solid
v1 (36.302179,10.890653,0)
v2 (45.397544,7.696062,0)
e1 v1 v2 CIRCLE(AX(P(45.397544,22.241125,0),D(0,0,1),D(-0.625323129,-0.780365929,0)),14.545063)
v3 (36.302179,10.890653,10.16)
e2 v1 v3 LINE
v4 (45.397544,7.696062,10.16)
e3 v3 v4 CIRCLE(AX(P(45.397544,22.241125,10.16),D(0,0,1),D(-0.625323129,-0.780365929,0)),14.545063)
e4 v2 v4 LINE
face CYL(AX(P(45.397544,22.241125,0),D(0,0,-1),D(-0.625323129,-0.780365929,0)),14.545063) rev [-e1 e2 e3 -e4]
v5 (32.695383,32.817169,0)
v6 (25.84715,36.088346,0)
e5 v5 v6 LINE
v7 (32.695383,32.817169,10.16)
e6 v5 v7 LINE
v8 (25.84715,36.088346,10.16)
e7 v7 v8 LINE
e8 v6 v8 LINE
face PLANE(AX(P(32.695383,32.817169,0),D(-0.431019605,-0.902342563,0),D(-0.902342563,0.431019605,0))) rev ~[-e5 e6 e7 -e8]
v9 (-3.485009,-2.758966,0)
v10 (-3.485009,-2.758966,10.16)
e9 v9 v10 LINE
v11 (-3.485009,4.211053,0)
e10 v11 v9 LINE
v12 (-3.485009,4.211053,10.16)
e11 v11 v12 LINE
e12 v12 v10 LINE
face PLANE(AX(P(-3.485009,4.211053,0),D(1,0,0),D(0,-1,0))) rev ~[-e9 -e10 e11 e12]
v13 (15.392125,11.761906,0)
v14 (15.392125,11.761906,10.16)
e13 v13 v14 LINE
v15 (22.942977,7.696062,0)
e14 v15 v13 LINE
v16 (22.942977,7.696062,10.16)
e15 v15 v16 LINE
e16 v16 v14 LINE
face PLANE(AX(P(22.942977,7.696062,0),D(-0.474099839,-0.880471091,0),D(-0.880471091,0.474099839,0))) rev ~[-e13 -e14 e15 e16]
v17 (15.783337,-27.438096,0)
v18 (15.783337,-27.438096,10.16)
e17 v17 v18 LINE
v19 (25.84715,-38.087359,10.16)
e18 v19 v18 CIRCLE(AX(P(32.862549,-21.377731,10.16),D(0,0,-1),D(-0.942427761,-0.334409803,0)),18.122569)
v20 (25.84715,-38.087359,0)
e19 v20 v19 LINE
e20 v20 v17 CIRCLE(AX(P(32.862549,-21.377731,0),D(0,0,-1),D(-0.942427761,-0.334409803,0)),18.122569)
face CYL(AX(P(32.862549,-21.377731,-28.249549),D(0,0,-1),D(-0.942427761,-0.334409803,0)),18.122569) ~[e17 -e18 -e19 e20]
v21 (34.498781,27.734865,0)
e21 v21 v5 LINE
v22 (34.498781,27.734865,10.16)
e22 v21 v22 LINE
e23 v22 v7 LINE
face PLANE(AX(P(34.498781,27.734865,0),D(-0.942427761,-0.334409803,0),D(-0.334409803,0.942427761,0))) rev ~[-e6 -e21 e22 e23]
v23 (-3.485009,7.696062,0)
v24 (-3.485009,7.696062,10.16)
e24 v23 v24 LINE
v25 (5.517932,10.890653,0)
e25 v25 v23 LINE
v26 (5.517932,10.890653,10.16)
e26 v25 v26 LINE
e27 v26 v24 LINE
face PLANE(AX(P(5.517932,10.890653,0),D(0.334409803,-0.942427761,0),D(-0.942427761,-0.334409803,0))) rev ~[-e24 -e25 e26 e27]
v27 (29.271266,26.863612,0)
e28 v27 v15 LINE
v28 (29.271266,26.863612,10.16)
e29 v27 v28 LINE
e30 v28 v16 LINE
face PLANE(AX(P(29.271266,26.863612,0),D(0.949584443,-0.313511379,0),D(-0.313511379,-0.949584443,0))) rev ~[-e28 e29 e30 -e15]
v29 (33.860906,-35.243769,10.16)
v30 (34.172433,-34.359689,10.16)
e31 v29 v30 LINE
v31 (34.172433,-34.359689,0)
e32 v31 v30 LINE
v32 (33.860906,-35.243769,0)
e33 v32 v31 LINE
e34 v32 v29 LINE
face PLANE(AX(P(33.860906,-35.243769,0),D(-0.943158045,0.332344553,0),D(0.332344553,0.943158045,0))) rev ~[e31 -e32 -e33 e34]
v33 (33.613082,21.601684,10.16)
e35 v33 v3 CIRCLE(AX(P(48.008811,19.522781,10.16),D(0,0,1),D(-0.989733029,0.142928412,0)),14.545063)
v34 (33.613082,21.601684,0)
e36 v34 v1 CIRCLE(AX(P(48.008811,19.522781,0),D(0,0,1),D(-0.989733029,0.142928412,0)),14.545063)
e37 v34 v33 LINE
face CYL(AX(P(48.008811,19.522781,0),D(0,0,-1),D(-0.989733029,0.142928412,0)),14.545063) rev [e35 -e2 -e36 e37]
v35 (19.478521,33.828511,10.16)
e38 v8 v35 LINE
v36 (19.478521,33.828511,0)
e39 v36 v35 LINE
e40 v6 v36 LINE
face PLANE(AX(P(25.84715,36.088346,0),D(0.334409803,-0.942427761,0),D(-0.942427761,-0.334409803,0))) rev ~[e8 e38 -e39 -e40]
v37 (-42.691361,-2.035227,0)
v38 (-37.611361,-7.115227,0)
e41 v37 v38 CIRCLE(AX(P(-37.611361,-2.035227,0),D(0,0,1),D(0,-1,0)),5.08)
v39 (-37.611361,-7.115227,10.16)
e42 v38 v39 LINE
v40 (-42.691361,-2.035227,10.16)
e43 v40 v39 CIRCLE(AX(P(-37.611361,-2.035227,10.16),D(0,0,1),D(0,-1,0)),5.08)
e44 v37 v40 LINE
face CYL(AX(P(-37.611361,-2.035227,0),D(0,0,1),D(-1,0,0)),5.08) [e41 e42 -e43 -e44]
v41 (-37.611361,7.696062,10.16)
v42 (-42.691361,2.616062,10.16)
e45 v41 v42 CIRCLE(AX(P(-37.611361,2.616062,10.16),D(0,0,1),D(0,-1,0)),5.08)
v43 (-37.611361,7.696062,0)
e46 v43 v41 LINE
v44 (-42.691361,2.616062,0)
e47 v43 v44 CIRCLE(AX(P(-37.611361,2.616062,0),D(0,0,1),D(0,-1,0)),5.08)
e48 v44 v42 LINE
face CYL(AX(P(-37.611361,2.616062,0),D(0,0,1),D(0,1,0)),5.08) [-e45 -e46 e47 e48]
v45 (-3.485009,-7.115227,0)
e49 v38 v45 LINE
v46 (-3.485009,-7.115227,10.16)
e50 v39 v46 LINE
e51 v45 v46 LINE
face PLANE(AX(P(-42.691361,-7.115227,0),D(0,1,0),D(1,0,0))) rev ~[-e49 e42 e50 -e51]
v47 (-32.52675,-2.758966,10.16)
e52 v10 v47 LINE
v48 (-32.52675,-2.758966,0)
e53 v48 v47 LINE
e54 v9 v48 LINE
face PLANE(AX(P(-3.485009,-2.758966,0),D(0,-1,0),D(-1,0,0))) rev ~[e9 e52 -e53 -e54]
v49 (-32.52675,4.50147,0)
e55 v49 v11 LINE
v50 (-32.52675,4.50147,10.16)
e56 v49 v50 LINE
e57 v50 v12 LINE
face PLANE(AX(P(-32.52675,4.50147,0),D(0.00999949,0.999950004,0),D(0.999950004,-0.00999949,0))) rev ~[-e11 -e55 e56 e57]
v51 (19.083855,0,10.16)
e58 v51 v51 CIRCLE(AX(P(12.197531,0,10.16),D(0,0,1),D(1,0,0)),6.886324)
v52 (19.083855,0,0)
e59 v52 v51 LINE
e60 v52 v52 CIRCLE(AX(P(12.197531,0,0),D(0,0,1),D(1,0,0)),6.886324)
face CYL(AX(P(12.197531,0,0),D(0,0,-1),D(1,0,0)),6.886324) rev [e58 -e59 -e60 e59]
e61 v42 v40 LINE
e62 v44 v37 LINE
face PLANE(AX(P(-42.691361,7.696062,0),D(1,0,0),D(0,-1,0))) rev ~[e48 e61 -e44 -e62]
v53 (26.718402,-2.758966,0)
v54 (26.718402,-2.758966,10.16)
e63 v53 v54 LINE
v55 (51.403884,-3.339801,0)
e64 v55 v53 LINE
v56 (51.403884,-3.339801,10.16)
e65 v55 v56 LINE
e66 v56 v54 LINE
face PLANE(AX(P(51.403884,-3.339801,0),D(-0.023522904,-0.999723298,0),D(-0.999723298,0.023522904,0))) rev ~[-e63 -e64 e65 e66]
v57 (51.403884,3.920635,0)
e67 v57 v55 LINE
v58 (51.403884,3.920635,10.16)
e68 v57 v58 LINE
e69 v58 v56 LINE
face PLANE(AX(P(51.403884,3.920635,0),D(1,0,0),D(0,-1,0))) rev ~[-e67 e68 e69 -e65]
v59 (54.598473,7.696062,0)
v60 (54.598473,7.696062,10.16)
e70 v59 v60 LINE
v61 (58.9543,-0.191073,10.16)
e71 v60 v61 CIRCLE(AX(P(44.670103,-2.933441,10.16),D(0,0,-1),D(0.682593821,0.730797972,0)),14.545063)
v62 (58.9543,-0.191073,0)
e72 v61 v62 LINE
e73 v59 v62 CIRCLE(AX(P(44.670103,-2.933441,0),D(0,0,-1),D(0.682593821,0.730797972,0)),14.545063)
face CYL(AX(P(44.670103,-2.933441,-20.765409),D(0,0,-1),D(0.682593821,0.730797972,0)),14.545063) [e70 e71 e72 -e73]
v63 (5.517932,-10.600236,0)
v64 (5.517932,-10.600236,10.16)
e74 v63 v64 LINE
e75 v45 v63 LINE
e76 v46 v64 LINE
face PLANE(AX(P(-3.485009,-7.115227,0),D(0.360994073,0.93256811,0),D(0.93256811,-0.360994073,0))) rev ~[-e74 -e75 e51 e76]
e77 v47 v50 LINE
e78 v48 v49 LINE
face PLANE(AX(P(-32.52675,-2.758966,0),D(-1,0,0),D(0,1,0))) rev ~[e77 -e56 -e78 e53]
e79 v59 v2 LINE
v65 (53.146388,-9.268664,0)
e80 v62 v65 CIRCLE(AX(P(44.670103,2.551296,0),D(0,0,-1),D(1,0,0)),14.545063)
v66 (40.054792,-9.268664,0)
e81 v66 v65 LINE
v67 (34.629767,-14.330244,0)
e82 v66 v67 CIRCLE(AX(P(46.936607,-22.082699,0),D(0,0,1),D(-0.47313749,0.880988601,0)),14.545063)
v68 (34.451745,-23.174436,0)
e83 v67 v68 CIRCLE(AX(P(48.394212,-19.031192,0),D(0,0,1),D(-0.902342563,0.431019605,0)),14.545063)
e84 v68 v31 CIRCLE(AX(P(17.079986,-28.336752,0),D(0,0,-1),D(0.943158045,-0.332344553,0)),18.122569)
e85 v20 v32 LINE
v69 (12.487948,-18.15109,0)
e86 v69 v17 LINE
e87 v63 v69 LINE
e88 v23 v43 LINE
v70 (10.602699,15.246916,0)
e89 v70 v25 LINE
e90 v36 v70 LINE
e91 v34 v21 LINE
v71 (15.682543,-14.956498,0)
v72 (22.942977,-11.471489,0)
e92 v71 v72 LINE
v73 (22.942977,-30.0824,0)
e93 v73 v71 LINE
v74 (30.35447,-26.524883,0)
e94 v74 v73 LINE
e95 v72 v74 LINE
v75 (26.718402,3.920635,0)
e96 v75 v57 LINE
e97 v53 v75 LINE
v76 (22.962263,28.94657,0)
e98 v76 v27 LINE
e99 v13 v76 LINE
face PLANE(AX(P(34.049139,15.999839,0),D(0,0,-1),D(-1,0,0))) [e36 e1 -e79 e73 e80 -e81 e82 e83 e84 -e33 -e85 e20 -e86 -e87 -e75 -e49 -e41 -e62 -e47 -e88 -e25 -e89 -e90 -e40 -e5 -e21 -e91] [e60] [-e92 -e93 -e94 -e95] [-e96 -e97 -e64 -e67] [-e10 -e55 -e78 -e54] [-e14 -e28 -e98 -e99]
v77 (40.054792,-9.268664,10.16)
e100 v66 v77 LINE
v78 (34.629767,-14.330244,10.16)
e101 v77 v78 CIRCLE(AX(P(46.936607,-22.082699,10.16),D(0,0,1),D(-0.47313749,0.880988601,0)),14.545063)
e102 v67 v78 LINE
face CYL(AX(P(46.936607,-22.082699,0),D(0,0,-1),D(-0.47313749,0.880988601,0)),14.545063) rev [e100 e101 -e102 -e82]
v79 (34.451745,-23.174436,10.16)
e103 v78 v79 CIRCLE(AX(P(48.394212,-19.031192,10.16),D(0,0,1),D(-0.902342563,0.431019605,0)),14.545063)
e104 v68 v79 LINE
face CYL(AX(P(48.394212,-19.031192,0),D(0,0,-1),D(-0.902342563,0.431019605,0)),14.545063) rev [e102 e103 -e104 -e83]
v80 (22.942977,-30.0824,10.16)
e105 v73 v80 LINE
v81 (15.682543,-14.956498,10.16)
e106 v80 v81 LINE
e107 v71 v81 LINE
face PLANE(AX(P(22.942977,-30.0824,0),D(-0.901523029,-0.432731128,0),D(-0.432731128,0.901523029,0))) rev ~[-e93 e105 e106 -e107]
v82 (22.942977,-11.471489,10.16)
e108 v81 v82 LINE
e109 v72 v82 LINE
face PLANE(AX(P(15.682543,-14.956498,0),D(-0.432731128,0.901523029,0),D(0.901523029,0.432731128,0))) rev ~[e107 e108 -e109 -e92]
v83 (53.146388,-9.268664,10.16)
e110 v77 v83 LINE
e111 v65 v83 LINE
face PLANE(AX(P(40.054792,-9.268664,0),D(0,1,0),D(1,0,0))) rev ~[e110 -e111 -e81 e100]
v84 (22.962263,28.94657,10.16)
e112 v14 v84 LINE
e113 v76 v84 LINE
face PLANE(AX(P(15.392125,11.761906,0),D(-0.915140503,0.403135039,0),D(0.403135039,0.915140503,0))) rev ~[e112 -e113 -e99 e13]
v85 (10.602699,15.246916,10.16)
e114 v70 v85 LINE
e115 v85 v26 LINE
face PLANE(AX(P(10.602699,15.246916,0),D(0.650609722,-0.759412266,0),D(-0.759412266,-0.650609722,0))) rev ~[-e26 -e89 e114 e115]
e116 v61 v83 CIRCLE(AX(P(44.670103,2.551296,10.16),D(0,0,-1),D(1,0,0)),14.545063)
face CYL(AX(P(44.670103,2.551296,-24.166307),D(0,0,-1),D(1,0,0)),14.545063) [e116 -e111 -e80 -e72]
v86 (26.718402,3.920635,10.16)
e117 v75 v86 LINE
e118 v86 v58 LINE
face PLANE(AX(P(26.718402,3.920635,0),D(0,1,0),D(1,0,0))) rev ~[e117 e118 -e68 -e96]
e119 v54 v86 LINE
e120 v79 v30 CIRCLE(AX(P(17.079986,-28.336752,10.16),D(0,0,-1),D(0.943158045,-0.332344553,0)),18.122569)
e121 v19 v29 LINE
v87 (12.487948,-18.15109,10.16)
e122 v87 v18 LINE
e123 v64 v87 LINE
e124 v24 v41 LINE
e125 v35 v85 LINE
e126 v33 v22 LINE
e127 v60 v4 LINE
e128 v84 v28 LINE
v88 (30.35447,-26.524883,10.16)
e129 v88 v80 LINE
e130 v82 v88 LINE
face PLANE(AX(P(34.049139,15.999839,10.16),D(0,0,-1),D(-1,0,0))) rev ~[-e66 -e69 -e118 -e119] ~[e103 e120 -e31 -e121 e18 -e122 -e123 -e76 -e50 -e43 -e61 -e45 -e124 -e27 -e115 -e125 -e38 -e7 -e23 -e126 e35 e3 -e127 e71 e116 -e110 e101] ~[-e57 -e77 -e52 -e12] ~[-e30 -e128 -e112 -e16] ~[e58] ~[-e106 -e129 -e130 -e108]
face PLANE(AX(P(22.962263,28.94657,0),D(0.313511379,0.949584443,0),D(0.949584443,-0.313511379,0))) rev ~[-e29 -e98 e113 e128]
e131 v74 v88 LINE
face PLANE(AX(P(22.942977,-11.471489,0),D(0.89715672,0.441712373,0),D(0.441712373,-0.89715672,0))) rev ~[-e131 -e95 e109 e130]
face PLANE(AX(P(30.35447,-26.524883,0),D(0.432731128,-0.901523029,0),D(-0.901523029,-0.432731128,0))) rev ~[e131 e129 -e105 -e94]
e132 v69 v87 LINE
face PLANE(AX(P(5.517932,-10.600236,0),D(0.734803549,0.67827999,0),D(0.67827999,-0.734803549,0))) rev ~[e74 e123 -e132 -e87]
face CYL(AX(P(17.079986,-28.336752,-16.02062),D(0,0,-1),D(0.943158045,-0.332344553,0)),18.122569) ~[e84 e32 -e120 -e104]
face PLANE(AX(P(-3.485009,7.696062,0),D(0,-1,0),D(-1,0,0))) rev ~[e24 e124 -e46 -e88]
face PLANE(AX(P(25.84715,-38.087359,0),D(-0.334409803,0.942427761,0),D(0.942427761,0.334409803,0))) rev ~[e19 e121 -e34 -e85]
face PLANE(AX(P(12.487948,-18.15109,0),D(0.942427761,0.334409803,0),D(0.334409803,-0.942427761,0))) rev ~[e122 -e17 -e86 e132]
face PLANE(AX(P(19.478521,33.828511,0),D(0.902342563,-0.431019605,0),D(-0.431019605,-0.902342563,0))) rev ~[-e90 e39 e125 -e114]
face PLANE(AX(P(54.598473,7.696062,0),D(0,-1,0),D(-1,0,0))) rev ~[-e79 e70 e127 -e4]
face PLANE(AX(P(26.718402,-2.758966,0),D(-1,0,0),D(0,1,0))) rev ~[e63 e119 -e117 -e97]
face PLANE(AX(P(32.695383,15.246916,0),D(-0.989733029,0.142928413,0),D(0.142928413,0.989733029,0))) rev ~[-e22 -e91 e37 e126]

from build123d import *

# Parameters (mm, degrees)
F0_R        = 6.8863244876
F1_DEPTH    = 10.16
F2_T1_DEPTH = 66.6590982347
F2_T3_DEPTH = 42.201240443
F3_T1_DEPTH = 10.16
F3_T3_DEPTH = 58.4926144872
F3_T5_DEPTH = 51.6908183144
F4_R        = 5.08


# Not quite as in the source:
# - a fillet or chamfer that OpenCascade refuses, or shapes differently, is made with other operations: its cross-section is extruded or revolved along the edge and cut away or added


with BuildPart() as f1:
    # F0 (on Top) → F1 (new body)
    with BuildSketch(Plane.XY):
        Polygon((10.6026988985, 15.246915631), (5.517931655, 10.8906533569), (-3.485009307, 7.6960618608), (-42.6913611591, 7.6960618608), (-42.6913611591, -7.1152271703), (-3.485009307, -7.1152271703), (5.517931655, -10.6002362445), (12.4879479408, -18.1510895491), (19.5621072062, -38.0873594287), (25.8471500129, -38.0873594287), (33.8609059311, -35.2437690269), (36.3021790981, -28.315698728), (32.69538281, -18.1510895491), (36.3021790981, -10.6002362445), (40.0547920587, -9.2686640946), (53.1463883817, -9.2686640946), (59.2151660388, -7.1152271703), (59.2151660388, 5.3727226332), (54.5984730124, 7.6960618608), (40.0547920587, 7.6960618608), (36.3021790981, 10.8906533569), (32.69538281, 15.246915631), (34.4987809541, 27.7348645031), (32.69538281, 32.8171690926), (25.8471500129, 36.0883464863), (19.4785206028, 33.8285105681), align=None)
        Polygon((15.6825426966, -14.9564975873), (22.9429770261, -11.4714885131), (30.3544697336, -26.5248827454), (22.9429770261, -30.0823998534), align=None, mode=Mode.SUBTRACT)
        Polygon((-32.5267501175, -2.7589655947), (-32.5267501175, 4.501469899), (-3.485009307, 4.2110527866), (-3.485009307, -2.7589655947), align=None, mode=Mode.SUBTRACT)
        with Locations((12.1975308284, 0)):
            Circle(F0_R, mode=Mode.SUBTRACT)
        Polygon((51.4038838446, -3.339800518), (26.7184022814, -2.7589655947), (26.7184022814, 3.9206352085), (51.4038838446, 3.9206352085), align=None, mode=Mode.SUBTRACT)
        Polygon((22.9429770261, 7.6960618608), (15.3921246529, 11.7619056255), (22.962263142, 28.9465700275), (29.2712664114, 26.8636122346), align=None, mode=Mode.SUBTRACT)
    extrude(amount=F1_DEPTH)

    # F2: fillet of radius 18.1225687259 on 2 edges, made by hand

    # F2_s2 → F2_t1 (cut)
    with BuildSketch(Plane.XY.offset(-28.2495491174)):
        with BuildLine():
            ThreePointArc((15.7833367489, -27.4380957037), (19.6910161344, -33.825149661), (25.8471500129, -38.0873594287))
            Line((25.8471500129, -38.0873594287), (19.5621072062, -38.0873594287))
            Line((19.5621072062, -38.0873594287), (15.7833367489, -27.4380957037))
        make_face()
    extrude(amount=F2_T1_DEPTH, mode=Mode.SUBTRACT)

    # F2_s4 → F2_t3 (cut)
    with BuildSketch(Plane.XY.offset(-16.0206202215)):
        with BuildLine():
            ThreePointArc((34.1724327506, -34.3596894675), (35.202544115, -28.3169031391), (34.15919812, -22.2763878325))
            Line((34.15919812, -22.2763878325), (36.3021790981, -28.315698728))
            Line((36.3021790981, -28.315698728), (34.1724327506, -34.3596894675))
        make_face()
    extrude(amount=F2_T3_DEPTH, mode=Mode.SUBTRACT)

    # F3: fillet of radius 14.545063472 on 6 edges, made by hand

    # F3_s2 → F3_t1 (join)
    with BuildSketch(Plane.XY):
        with BuildLine():
            ThreePointArc((33.6130817468, 21.6016839559), (33.901548417, 15.9810300876), (36.3021790981, 10.8906533569))
            Line((36.3021790981, 10.8906533569), (32.69538281, 15.246915631))
            Line((32.69538281, 15.246915631), (33.6130817468, 21.6016839559))
        make_face()
        with BuildLine():
            ThreePointArc((36.3021790981, 10.8906533569), (40.5775055267, 8.5179295182), (45.3975437049, 7.6960618608))
            Line((45.3975437049, 7.6960618608), (40.0547920587, 7.6960618608))
            Line((40.0547920587, 7.6960618608), (36.3021790981, 10.8906533569))
        make_face()
        with BuildLine():
            ThreePointArc((35.2695823203, -12.7619848351), (33.8938078195, -17.8922695477), (34.4517445702, -23.1744360815))
            Line((34.4517445702, -23.1744360815), (33.0574978105, -23.5887604555))
            ThreePointArc((33.0574978105, -23.5887604555), (32.7884309604, -22.7627890129), (31.3246156504, -18.6374907295))
            Line((31.3246156504, -18.6374907295), (31.3829198252, -17.5241687984))
            Line((31.3829198252, -17.5241687984), (33.9571193355, -12.1350640844))
            Line((33.9571193355, -12.1350640844), (35.2695823203, -12.7619848351))
        make_face()
        with BuildLine():
            ThreePointArc((40.0547920587, -9.2686640946), (36.4117244984, -12.043489977), (33.8119770372, -15.8134917097))
            Line((33.8119770372, -15.8134917097), (36.3021790981, -10.6002362445))
            Line((36.3021790981, -10.6002362445), (40.0547920587, -9.2686640946))
        make_face()
    extrude(amount=F3_T1_DEPTH)

    # F3_s4 → F3_t3 (cut)
    with BuildSketch(Plane.XY.offset(-24.1663072436)):
        with BuildLine():
            ThreePointArc((59.2151660388, 2.5512957272), (57.6093256229, -4.0921505253), (53.1463883817, -9.2686640946))
            Line((53.1463883817, -9.2686640946), (59.2151660388, -7.1152271703))
            Line((59.2151660388, -7.1152271703), (59.2151660388, 2.5512957272))
        make_face()
    extrude(amount=F3_T3_DEPTH, mode=Mode.SUBTRACT)

    # F3_s6 → F3_t5 (cut)
    with BuildSketch(Plane.XY.offset(-20.7654091572)):
        with BuildLine():
            ThreePointArc((54.5984730124, 7.6960618608), (58.011160428, 2.8609568294), (59.2151660388, -2.9334410297))
            Line((59.2151660388, -2.9334410297), (59.2151660388, 5.3727226332))
            Line((59.2151660388, 5.3727226332), (54.5984730124, 7.6960618608))
        make_face()
    extrude(amount=F3_T5_DEPTH, mode=Mode.SUBTRACT)

    # F4
    f4_edges = [f1.edges().sort_by_distance(p)[0] for p in [
        (-42.691361, 7.696062, 5.08),
        (-42.691361, -7.115227, 5.08),
    ]]
    fillet(f4_edges, radius=F4_R)


solid = f1.part
